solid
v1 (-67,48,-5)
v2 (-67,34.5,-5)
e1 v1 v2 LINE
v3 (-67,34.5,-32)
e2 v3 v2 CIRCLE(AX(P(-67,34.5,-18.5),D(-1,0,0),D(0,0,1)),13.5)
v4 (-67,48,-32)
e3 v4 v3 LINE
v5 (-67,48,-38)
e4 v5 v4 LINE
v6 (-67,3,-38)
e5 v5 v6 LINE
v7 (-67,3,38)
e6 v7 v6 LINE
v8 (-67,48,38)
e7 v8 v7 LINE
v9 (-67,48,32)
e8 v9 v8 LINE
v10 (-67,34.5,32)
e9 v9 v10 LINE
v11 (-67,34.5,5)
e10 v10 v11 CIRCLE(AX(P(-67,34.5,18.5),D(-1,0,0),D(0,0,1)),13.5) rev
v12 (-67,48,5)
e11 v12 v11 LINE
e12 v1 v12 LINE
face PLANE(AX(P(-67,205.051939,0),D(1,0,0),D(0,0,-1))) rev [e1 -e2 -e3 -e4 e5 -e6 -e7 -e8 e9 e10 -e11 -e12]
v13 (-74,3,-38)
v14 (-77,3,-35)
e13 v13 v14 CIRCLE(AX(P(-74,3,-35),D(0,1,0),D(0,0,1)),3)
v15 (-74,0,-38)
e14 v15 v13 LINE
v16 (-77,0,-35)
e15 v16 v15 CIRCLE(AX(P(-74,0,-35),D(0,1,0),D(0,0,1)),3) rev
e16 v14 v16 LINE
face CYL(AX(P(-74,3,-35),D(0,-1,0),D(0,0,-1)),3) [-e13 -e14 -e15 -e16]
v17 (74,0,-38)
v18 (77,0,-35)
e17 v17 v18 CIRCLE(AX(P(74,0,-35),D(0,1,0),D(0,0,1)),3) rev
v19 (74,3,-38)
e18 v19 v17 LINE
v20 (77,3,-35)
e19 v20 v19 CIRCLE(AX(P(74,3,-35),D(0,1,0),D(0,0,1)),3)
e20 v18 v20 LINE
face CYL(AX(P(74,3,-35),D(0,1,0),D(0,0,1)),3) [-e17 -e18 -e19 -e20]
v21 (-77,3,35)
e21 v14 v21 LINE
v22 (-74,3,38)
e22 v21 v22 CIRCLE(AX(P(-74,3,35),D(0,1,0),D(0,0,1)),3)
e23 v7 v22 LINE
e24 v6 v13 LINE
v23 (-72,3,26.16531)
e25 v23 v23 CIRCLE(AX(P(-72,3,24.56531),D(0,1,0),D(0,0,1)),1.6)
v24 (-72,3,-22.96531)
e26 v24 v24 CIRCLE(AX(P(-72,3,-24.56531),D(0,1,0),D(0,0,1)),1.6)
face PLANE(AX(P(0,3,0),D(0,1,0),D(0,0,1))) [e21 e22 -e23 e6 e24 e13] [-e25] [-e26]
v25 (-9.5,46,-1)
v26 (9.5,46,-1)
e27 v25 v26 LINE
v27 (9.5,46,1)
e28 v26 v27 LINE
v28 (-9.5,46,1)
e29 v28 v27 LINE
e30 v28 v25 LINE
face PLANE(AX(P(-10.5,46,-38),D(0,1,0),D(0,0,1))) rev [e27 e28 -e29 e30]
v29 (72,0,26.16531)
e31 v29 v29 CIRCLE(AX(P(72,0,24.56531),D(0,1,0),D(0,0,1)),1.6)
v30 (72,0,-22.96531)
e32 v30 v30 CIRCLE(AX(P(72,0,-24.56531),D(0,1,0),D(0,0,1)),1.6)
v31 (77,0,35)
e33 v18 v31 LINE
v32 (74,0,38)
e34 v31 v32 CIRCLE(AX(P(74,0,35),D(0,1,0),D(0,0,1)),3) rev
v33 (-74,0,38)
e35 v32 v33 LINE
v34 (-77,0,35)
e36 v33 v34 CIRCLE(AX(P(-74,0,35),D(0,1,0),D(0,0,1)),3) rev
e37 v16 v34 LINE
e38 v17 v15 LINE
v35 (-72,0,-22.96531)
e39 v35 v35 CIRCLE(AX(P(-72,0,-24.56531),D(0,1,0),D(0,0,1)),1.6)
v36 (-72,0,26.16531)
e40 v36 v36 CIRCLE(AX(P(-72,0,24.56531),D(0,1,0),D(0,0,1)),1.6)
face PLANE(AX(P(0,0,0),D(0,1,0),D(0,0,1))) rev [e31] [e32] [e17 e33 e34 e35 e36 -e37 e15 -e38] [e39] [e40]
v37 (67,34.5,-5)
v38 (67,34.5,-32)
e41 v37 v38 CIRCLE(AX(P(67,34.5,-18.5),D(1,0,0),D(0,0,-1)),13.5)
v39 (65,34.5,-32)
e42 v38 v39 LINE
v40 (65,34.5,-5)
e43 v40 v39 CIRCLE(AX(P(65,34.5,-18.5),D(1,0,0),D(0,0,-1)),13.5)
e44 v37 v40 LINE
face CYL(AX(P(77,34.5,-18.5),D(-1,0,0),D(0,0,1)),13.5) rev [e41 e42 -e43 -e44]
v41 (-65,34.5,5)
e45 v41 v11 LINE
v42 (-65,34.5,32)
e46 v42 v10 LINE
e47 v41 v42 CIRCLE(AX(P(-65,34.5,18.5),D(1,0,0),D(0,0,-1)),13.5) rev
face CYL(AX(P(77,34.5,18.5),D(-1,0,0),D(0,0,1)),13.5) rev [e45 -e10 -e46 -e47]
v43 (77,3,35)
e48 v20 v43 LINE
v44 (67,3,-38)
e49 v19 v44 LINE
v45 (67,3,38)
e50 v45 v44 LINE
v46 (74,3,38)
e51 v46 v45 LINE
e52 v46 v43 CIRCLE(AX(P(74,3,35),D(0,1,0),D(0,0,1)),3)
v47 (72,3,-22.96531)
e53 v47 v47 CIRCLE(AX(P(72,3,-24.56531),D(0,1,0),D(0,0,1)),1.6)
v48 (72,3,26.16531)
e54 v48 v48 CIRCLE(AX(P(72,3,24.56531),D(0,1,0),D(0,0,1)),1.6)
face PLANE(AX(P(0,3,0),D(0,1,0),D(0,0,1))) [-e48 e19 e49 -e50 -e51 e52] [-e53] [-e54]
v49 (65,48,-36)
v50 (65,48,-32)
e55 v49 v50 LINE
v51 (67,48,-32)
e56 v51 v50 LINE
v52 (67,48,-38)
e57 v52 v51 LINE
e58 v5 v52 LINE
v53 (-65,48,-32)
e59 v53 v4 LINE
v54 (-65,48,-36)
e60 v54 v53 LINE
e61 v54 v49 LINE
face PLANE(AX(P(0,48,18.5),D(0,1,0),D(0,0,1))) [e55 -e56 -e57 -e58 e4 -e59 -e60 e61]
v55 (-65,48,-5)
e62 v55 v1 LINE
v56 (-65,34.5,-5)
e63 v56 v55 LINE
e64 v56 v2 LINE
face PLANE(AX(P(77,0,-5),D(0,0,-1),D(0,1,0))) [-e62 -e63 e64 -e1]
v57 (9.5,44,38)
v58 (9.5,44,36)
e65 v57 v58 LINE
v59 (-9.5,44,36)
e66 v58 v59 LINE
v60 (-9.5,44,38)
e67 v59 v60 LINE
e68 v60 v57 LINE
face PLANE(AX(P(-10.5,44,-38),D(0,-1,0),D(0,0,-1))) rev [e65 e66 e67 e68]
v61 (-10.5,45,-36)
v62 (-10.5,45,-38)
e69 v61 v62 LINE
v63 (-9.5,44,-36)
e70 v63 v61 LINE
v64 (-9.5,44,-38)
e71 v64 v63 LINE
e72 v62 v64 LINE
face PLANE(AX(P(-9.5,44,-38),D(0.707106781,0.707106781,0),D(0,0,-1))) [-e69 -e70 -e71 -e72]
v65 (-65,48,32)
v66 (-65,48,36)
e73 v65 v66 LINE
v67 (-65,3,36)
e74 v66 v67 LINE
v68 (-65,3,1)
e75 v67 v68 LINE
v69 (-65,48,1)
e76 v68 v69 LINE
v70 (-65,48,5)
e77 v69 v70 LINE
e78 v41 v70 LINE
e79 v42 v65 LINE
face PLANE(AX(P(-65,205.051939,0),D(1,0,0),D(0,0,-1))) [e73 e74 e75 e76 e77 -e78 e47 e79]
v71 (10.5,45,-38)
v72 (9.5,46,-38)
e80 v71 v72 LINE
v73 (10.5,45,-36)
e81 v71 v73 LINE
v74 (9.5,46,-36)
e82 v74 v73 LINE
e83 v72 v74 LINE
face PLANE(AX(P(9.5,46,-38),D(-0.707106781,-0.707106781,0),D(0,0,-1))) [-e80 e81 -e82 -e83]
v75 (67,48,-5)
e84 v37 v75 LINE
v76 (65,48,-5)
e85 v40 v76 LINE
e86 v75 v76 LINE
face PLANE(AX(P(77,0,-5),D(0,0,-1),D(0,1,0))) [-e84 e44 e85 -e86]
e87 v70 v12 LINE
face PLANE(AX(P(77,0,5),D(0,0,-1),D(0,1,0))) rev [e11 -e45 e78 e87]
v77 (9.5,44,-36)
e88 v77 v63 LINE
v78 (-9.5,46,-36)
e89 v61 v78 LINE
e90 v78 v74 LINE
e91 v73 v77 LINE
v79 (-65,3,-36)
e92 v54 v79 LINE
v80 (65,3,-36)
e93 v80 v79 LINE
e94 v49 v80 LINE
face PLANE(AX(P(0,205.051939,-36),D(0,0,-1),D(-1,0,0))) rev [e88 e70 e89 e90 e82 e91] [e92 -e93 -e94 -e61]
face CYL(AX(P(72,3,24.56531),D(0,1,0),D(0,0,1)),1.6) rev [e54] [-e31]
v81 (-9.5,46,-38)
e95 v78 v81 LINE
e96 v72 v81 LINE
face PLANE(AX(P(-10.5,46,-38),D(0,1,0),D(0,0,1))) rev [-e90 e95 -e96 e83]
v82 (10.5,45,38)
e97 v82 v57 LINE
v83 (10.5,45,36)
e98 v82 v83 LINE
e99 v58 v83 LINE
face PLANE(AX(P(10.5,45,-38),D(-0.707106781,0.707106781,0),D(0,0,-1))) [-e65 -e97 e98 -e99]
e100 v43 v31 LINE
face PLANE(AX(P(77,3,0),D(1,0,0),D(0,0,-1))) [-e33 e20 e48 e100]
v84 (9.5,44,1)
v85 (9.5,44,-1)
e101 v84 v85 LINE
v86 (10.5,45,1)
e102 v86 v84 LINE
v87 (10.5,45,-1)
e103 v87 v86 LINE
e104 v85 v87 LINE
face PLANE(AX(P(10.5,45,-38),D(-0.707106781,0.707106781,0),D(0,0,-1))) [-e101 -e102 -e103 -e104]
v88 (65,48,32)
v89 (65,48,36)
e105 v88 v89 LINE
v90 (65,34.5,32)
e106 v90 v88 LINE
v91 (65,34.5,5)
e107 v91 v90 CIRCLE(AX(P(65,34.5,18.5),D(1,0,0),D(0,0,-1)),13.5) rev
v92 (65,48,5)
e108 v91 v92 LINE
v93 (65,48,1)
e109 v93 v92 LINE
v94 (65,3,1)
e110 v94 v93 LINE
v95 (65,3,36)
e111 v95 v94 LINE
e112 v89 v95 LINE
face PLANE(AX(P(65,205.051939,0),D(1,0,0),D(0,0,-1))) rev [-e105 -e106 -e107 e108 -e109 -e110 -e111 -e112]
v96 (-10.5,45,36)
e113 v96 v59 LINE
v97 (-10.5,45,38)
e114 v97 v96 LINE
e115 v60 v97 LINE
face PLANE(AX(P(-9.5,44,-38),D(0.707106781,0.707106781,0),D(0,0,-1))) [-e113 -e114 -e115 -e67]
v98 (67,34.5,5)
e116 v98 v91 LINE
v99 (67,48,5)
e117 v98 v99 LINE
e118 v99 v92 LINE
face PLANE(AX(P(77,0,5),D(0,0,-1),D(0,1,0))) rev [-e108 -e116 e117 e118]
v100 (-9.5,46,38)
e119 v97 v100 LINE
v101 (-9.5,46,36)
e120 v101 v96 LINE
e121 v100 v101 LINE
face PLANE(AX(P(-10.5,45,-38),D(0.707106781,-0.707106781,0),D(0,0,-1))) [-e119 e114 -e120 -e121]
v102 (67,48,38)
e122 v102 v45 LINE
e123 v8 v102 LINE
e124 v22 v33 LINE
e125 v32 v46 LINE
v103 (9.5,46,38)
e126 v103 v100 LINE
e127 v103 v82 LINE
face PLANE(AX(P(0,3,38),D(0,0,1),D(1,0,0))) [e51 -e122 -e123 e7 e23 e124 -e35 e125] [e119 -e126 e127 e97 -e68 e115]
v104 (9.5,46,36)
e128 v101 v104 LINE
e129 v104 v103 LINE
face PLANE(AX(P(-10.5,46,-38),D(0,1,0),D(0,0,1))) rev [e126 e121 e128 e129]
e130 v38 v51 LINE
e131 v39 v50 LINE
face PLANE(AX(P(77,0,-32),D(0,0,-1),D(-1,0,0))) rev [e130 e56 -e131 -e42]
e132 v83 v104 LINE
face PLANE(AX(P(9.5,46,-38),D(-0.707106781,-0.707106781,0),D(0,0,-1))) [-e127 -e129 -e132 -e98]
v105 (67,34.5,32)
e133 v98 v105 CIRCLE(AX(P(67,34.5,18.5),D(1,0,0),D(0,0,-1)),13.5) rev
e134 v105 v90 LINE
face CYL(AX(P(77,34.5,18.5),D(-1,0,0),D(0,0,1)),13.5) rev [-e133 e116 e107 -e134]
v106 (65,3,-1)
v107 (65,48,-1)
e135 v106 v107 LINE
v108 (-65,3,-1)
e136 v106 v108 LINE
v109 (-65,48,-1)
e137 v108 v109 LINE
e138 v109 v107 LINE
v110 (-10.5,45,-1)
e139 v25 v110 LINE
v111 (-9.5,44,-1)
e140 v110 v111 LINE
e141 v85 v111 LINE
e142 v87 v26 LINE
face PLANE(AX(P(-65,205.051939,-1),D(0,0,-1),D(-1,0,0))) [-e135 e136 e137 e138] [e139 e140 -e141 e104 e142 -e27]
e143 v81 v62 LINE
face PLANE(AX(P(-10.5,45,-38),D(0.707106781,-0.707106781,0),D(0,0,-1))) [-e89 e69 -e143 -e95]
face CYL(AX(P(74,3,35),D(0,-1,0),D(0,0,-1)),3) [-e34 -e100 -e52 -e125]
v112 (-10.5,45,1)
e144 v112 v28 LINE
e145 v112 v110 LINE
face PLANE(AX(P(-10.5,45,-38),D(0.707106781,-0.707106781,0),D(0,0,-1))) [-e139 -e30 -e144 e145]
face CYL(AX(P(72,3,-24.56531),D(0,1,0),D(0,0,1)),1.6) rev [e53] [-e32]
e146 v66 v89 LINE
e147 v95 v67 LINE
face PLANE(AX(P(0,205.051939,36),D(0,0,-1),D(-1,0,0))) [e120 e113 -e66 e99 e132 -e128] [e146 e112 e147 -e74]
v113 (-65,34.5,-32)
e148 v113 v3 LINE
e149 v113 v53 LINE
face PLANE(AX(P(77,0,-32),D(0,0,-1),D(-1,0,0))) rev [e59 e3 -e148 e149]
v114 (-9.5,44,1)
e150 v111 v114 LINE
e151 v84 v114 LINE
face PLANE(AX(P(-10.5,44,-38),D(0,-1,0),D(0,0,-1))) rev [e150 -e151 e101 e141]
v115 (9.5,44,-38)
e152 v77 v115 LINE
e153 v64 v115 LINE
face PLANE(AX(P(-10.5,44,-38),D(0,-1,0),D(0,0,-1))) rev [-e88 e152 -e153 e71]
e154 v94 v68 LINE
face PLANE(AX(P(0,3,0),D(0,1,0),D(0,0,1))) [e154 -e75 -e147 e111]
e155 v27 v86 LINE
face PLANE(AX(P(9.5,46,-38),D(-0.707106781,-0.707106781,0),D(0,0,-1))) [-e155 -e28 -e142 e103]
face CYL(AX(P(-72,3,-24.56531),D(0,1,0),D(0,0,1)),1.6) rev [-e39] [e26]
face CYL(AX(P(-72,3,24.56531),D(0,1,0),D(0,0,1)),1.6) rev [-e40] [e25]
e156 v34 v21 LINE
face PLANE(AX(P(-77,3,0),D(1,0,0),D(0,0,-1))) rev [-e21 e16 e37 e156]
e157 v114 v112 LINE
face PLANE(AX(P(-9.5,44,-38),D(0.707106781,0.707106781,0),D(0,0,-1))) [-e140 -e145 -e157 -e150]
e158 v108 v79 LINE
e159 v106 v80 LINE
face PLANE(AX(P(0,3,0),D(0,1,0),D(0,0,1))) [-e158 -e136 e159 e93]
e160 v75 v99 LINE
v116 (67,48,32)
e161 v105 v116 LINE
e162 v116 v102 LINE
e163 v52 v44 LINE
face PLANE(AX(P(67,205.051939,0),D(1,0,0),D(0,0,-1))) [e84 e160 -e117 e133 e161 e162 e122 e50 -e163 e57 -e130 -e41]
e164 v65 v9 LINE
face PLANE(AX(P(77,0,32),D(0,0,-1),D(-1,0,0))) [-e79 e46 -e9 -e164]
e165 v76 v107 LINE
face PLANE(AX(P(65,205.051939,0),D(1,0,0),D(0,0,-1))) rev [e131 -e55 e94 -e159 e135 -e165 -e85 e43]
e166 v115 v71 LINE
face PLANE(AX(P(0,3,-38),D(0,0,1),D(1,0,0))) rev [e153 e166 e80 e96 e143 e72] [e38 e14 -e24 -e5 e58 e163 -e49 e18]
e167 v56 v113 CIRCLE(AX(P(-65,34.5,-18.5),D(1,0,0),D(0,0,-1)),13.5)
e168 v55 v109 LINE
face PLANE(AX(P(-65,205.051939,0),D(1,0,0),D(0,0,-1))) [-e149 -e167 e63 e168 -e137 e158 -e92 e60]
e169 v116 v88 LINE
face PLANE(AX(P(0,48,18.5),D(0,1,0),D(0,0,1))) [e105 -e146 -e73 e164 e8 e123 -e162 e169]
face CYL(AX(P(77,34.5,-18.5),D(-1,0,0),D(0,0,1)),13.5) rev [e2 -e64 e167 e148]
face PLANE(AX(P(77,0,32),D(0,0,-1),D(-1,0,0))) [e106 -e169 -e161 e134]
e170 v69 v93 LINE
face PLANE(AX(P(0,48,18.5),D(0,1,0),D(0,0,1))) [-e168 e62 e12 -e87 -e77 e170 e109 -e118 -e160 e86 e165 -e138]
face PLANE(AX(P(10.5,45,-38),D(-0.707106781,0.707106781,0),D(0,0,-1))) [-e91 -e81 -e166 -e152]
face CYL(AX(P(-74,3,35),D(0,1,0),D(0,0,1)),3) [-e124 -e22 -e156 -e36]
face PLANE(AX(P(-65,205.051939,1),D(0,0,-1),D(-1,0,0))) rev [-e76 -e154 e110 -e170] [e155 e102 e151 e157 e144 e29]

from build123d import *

# Parameters (mm, degrees)
SZKIC1_W                    = 154
SZKIC1_H                    = 76
DODANIE_WYCI_GNI_CIE1_DEPTH = 3
SZKIC1_3_W                  = 134
SZKIC1_3_H                  = 76
SZKIC1_3_W_2                = 130
SZKIC1_3_H_2                = 72
SZKIC1_3_H_3                = 2
DODANIE_WYCI_GNI_CIE2_DEPTH = 48
WYTNIJ_WYCI_GNI_CIE1_DEPTH  = 157.473639953
M3_CLEARANCE_HOLE1_D        = 3.2
M3_CLEARANCE_HOLE1_DEPTH    = 7.7
M3_CLEARANCE_HOLE1_TIP      = 0.96137699
ZAOKR_GLENIE1_R             = 3
SZKIC6_W                    = 21
SZKIC6_H                    = 2
WYTNIJ_WYCI_GNI_CIE2_DEPTH  = 119.359621493
SFAZOWANIE1_SIZE            = 1


with BuildPart() as part:
    # Szkic1 → Dodanie-wyciągnięcie1 (new body)
    with BuildSketch(Plane(origin=(0, 0, 0), x_dir=(1, 0, 0), z_dir=(0, 1, 0))):
        Rectangle(SZKIC1_W, SZKIC1_H)
    extrude(amount=DODANIE_WYCI_GNI_CIE1_DEPTH)

    # Szkic1<3> → Dodanie-wyciągnięcie2 (add)
    # profile 1 of 2: a face of its own
    with BuildSketch(Plane(origin=(0, 0, 0), x_dir=(1, 0, 0), z_dir=(0, 1, 0))):
        Rectangle(SZKIC1_3_W, SZKIC1_3_H)
        Rectangle(SZKIC1_3_W_2, SZKIC1_3_H_2, mode=Mode.SUBTRACT)
    # profile 2 of 2: a face of its own
    with BuildSketch(Plane(origin=(0, 0, 0), x_dir=(1, 0, 0), z_dir=(0, 1, 0))):
        Rectangle(SZKIC1_3_W_2, SZKIC1_3_H_3)
    extrude(amount=DODANIE_WYCI_GNI_CIE2_DEPTH)

    # Szkic2 → Wytnij-wyciągnięcie1 (cut, through all)
    with BuildSketch(Plane.ZY.offset(67)):
        with BuildLine():
            ThreePointArc((-5, 34.5), (-8.954058454, 44.045941546), (-18.5, 48))
            ThreePointArc((-18.5, 48), (-28.045941546, 44.045941546), (-32, 34.5))
            Line((-32, 34.5), (-5, 34.5))
        make_face()
        with BuildLine():
            Line((-5, 34.5), (-32, 34.5))
            ThreePointArc((-32, 34.5), (-18.5, 21), (-5, 34.5))
        make_face()
        with BuildLine():
            Line((-18.5, 48), (-32, 48))
            Line((-32, 48), (-32, 34.5))
            ThreePointArc((-32, 34.5), (-28.045941546, 44.045941546), (-18.5, 48))
        make_face()
        with BuildLine():
            Line((-5, 48), (-18.5, 48))
            ThreePointArc((-18.5, 48), (-8.954058454, 44.045941546), (-5, 34.5))
            Line((-5, 34.5), (-5, 48))
        make_face()
        with BuildLine():
            ThreePointArc((18.5, 48), (8.954058454, 44.045941546), (5, 34.5))
            Line((5, 34.5), (32, 34.5))
            ThreePointArc((32, 34.5), (28.045941546, 44.045941546), (18.5, 48))
        make_face()
        with BuildLine():
            Line((32, 34.5), (5, 34.5))
            ThreePointArc((5, 34.5), (18.5, 21), (32, 34.5))
        make_face()
        with BuildLine():
            Line((18.5, 48), (5, 48))
            Line((5, 48), (5, 34.5))
            ThreePointArc((5, 34.5), (8.954058454, 44.045941546), (18.5, 48))
        make_face()
        with BuildLine():
            Line((32, 48), (18.5, 48))
            ThreePointArc((18.5, 48), (28.045941546, 44.045941546), (32, 34.5))
            Line((32, 34.5), (32, 48))
        make_face()
    extrude(amount=-WYTNIJ_WYCI_GNI_CIE1_DEPTH, mode=Mode.SUBTRACT)

    # M3 Clearance Hole1
    with Locations(Plane(origin=(0, 3, 0), x_dir=(1, 0, 0), z_dir=(0, 1, 0))):
        with Locations((-72, 24.565309611), (-72, -24.565309611), (72, -24.565309611), (72, 24.565309611)):
            Hole(M3_CLEARANCE_HOLE1_D / 2, depth=M3_CLEARANCE_HOLE1_DEPTH)
            with Locations((0, 0, -(M3_CLEARANCE_HOLE1_DEPTH + M3_CLEARANCE_HOLE1_TIP / 2))):  # 118° drill point
                Cone(0, M3_CLEARANCE_HOLE1_D / 2, M3_CLEARANCE_HOLE1_TIP, mode=Mode.SUBTRACT)

    # Zaokrąglenie1
    zaokr_glenie1_edges = [part.edges().sort_by_distance(p)[0] for p in [
        (77, 1.5, 38),
        (77, 1.5, -38),
        (-77, 1.5, 38),
        (-77, 1.5, -38),
    ]]
    fillet(zaokr_glenie1_edges, radius=ZAOKR_GLENIE1_R)

    # Szkic6 → Wytnij-wyciągnięcie2 (cut, through all)
    with BuildSketch(Plane.XY.offset(38)):
        with Locations((0, 45)):
            Rectangle(SZKIC6_W, SZKIC6_H)
    extrude(amount=-WYTNIJ_WYCI_GNI_CIE2_DEPTH, mode=Mode.SUBTRACT)

    # Sfazowanie1
    sfazowanie1_edges = [part.edges().sort_by_distance(p)[0] for p in [
        (10.5, 44, 37),
        (10.5, 46, 37),
        (-10.5, 46, 37),
        (-10.5, 44, 37),
        (10.5, 46, -37),
        (10.5, 44, -37),
        (-10.5, 46, -37),
        (-10.5, 44, -37),
        (-10.5, 46, 0),
        (-10.5, 44, 0),
        (10.5, 46, 0),
        (10.5, 44, 0),
    ]]
    chamfer(sfazowanie1_edges, length=SFAZOWANIE1_SIZE - 0.0001)  # a hair under: the kernel refuses the full size


solid = part.part
